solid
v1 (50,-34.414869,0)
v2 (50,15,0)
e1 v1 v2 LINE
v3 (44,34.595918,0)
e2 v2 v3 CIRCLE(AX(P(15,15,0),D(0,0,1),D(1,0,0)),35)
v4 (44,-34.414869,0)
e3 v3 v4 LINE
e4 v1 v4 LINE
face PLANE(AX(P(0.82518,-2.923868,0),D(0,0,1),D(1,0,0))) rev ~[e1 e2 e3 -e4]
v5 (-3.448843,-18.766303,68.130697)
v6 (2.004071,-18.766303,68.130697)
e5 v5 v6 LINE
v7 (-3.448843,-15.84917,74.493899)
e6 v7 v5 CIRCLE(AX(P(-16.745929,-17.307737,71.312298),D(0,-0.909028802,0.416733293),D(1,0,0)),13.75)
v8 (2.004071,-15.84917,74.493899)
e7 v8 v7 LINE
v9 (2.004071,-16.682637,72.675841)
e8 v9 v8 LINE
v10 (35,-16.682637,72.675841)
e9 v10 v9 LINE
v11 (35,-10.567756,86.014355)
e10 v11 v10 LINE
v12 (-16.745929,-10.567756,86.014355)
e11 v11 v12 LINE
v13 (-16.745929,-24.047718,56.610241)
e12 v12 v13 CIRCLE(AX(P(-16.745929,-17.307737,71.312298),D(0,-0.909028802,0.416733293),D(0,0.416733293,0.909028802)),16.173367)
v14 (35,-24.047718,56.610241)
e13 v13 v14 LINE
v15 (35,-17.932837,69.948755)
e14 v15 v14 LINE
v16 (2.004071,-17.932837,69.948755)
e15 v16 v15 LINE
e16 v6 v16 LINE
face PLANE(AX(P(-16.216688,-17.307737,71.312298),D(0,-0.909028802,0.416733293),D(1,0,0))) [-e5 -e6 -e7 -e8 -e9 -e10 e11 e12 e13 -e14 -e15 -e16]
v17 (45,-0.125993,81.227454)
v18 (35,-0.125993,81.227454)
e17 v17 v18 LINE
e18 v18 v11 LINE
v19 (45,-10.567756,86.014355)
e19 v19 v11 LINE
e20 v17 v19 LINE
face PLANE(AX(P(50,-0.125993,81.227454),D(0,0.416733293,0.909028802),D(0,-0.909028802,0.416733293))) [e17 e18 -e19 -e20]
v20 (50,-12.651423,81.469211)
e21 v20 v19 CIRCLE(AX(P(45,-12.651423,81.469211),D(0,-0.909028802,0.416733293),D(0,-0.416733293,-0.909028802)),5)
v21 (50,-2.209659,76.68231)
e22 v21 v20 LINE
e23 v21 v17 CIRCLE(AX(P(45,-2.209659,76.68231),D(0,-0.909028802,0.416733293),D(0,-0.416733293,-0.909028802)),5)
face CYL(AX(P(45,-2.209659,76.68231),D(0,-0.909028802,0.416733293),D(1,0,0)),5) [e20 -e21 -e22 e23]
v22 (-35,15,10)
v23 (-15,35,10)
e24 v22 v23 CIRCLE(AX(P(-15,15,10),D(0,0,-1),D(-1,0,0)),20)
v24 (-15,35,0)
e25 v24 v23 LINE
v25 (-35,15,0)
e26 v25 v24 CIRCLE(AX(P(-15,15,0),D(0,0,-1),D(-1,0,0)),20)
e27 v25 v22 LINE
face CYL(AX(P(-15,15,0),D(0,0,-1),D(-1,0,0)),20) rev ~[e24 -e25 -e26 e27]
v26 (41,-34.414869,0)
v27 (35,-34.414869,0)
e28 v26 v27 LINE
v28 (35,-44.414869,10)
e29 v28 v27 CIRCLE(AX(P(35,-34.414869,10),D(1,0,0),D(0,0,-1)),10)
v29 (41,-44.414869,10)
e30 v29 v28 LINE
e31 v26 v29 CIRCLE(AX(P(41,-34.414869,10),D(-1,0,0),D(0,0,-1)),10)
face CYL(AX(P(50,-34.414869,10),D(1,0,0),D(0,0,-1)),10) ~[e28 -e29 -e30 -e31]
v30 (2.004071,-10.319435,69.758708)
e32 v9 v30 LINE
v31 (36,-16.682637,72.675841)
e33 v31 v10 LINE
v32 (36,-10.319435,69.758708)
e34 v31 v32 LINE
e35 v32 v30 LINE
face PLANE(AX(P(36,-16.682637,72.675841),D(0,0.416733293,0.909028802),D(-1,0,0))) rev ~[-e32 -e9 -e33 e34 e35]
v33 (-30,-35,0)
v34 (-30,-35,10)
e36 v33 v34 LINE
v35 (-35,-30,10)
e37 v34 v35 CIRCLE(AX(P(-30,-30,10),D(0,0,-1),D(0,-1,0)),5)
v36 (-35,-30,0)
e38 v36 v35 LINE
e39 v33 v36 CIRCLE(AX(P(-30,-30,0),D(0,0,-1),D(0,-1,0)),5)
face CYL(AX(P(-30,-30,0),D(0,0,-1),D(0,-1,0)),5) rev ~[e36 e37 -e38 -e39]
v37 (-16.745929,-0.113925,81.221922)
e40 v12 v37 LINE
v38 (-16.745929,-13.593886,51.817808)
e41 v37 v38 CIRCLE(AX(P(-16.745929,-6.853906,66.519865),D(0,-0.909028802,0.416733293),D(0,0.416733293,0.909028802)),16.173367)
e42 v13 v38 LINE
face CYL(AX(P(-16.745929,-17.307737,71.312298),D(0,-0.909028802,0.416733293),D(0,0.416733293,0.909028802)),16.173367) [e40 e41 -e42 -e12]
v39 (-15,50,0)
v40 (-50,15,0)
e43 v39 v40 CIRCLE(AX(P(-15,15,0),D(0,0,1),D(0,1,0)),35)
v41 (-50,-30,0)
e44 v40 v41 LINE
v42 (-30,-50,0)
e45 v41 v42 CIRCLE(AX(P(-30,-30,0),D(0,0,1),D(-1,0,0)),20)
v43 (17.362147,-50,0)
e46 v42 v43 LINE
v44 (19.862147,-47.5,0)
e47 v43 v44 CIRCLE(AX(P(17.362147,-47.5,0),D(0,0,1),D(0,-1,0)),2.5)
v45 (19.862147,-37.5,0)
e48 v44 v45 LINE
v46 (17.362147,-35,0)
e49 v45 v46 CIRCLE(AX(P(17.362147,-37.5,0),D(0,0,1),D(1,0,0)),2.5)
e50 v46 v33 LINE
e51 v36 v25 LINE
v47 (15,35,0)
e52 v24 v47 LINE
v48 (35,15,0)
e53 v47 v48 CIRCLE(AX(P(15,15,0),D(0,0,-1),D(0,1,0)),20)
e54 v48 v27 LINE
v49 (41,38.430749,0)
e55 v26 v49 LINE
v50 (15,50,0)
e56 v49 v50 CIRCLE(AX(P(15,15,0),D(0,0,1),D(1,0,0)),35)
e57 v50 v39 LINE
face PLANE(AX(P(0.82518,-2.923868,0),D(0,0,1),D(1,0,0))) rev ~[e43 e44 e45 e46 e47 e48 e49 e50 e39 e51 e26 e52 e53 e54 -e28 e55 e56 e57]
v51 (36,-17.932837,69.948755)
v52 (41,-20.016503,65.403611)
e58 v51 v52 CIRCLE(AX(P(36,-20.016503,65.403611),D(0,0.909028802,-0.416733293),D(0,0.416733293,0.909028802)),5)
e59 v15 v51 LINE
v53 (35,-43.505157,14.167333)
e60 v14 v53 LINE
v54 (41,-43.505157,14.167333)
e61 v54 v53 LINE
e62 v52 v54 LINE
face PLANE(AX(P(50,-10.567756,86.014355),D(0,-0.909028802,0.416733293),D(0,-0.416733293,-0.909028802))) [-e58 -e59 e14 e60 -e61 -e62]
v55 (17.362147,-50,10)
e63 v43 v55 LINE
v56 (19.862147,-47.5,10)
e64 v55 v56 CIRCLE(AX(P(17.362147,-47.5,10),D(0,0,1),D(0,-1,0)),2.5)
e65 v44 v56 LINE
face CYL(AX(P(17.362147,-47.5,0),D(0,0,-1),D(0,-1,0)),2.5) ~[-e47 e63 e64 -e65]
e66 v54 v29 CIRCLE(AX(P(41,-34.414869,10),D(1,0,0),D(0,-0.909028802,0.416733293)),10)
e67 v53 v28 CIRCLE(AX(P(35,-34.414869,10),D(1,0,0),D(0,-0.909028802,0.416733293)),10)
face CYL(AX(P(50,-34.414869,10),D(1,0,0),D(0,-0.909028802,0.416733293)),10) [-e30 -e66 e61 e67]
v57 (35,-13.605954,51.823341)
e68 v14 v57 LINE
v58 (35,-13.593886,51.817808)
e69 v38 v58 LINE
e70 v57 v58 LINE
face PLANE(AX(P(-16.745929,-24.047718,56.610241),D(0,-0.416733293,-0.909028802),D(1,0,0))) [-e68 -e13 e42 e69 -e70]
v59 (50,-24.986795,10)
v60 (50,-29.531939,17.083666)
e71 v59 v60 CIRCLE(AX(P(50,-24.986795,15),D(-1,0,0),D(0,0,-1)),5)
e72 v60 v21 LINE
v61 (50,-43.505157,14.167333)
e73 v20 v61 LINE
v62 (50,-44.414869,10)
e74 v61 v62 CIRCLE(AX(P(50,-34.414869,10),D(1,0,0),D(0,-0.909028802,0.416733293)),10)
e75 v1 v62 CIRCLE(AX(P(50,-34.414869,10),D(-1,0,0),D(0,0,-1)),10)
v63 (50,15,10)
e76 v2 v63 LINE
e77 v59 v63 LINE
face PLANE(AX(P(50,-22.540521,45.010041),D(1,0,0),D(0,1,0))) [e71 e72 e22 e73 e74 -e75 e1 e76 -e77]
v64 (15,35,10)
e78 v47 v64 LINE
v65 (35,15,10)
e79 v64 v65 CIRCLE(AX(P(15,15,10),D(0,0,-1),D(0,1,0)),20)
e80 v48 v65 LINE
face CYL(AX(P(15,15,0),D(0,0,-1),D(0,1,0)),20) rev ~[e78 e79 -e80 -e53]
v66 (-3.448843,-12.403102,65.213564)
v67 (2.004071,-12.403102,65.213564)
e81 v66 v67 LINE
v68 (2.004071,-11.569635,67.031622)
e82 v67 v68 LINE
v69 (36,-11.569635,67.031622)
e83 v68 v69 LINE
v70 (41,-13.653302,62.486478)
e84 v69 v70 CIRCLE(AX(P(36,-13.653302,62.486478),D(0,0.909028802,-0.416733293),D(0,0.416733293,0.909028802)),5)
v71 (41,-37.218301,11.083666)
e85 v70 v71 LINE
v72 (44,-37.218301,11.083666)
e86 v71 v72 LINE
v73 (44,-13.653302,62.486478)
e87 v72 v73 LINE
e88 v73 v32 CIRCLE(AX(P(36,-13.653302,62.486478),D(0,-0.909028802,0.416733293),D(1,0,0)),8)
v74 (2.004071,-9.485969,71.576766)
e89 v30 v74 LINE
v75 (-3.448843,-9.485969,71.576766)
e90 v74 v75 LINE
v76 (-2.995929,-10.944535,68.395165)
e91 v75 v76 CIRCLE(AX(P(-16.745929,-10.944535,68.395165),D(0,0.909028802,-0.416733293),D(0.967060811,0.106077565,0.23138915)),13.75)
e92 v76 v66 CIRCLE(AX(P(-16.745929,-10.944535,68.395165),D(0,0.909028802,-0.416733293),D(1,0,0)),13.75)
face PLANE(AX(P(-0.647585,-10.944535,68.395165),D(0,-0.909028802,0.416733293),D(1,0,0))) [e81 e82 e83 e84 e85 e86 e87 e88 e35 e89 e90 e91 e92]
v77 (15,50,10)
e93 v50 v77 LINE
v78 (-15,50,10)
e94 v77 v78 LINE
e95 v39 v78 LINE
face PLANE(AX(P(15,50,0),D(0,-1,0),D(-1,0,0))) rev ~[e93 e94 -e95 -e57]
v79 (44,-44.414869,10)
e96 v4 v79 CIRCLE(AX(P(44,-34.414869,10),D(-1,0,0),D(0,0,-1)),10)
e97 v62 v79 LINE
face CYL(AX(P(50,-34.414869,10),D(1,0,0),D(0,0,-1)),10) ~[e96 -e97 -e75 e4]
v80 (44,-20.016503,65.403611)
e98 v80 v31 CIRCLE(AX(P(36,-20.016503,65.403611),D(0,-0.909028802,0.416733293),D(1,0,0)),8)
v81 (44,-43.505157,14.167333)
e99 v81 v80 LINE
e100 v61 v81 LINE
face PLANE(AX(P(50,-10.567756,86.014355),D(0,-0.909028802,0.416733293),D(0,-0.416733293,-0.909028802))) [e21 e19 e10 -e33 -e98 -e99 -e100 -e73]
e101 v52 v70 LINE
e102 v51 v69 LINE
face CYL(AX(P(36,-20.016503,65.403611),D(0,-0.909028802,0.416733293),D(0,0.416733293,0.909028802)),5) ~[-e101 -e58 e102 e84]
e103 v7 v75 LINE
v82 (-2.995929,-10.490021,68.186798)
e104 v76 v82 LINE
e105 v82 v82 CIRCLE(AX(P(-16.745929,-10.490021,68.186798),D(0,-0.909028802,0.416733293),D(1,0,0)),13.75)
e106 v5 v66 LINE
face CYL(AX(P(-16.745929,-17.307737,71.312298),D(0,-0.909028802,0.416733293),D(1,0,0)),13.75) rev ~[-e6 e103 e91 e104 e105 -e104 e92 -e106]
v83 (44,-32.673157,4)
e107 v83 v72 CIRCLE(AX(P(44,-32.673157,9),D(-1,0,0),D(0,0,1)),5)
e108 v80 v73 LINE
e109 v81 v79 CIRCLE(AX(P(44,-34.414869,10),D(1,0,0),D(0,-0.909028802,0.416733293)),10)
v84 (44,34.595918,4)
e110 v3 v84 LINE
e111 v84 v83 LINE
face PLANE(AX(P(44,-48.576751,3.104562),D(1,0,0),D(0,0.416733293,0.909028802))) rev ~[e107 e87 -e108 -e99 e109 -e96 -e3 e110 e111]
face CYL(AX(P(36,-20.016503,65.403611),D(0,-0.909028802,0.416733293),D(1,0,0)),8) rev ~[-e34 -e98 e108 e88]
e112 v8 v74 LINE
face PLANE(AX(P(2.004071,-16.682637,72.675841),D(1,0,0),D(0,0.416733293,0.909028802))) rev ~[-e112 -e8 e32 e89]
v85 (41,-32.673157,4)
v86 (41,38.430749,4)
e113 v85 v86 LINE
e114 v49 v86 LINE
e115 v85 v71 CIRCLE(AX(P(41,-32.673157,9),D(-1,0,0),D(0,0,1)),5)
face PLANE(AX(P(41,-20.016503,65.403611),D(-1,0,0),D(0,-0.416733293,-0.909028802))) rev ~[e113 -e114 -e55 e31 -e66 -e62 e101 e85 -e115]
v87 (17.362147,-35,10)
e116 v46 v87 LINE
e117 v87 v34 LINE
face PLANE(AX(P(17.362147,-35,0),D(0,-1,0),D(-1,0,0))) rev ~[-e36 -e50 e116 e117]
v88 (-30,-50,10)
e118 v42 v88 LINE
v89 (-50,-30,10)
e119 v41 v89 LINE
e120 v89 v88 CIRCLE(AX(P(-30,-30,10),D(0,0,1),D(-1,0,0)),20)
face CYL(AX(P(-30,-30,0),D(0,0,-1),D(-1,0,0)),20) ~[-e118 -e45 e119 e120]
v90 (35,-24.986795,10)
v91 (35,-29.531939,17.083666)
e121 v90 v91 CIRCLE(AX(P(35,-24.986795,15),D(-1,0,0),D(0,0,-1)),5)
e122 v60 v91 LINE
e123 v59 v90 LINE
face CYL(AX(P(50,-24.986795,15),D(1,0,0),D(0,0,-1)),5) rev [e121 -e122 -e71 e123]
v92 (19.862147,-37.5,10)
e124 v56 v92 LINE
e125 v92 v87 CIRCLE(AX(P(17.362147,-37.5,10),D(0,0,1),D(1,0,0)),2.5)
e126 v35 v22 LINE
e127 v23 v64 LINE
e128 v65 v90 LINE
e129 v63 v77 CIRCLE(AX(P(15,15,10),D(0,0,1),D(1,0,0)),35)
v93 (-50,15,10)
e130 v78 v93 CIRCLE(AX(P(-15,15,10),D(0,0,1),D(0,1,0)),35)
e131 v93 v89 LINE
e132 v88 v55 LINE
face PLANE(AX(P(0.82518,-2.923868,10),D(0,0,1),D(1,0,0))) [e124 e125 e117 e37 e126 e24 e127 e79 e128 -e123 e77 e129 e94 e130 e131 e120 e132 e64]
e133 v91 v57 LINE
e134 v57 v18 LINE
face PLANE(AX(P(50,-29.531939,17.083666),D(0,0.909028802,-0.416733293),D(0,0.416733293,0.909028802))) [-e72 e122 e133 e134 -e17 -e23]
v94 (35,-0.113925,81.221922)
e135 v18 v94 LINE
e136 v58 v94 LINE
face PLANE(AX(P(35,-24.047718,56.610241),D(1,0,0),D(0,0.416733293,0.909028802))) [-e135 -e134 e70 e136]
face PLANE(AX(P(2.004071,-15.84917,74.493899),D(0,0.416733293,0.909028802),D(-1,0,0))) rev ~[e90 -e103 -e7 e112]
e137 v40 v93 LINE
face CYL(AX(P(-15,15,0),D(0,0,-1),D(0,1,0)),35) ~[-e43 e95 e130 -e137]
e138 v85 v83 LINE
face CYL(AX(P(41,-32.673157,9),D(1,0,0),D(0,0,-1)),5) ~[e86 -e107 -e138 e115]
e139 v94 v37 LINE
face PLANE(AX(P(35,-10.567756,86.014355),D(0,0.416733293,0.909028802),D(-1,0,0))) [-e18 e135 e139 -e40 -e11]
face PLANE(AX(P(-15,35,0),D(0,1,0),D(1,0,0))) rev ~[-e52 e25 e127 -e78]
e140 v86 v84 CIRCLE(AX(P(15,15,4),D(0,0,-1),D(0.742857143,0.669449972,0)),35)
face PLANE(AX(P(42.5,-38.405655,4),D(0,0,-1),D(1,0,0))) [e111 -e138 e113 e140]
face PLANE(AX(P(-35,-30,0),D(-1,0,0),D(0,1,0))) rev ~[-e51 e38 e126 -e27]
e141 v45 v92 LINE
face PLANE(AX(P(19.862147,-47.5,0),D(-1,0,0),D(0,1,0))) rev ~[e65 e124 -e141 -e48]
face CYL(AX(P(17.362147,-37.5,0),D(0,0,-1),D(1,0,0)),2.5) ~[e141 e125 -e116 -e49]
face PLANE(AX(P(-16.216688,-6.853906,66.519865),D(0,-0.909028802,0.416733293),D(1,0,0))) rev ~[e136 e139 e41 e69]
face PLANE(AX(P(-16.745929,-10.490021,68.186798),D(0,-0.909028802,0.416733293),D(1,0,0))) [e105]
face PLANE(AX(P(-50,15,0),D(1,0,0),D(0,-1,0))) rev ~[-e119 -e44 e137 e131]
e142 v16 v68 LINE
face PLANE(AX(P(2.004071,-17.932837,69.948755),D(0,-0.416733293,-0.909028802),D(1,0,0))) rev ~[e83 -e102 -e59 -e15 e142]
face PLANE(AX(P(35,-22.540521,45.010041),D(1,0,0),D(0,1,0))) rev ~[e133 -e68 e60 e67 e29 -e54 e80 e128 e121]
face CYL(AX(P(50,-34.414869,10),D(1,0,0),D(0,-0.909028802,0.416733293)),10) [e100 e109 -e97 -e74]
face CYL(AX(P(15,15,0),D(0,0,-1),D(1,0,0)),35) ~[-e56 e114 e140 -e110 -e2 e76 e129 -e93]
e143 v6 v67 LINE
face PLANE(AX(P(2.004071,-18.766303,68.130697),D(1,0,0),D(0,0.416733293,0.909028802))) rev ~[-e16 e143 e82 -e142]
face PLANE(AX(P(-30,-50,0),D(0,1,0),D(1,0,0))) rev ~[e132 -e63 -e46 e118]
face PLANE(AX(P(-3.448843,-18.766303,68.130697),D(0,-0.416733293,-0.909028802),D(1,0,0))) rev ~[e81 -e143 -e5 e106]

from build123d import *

# Parameters (mm, degrees)
F1_DEPTH  = 10
F3_DEPTH  = 25.0000003725
F4_DEPTH  = 15
F5_R      = 13.75
F6_DEPTH  = 11.5
F7_DEPTH  = 7.5
F8_W      = 3
F8_H      = 12.169879545
F9_DEPTH  = 7
F10_W     = 3
F10_H     = 7.9815720619
F11_DEPTH = 4
F12_R     = 5
F13_R     = 5


# Not quite as in the source:
# - a feature names something its author has since deleted; it is built from what else it names


with BuildPart() as f1:
    # F0 (on Top) → F1 (new body)
    with BuildSketch(Plane.XY):
        with BuildLine():
            ThreePointArc((50, 15), (39.7487373415, 39.7487373415), (15, 50))
            Line((15, 50), (-15, 50))
            ThreePointArc((-15, 50), (-39.7487373415, 39.7487373415), (-50, 15))
            Line((-50, 15), (-50, -30))
            ThreePointArc((-50, -30), (-44.1421356237, -44.1421356237), (-30, -50))
            Line((-30, -50), (17.3621465266, -50))
            ThreePointArc((17.3621465266, -50), (19.1299134795, -49.267766953), (19.8621465266, -47.5))
            Line((19.8621465266, -47.5), (19.8621465266, -37.5))
            ThreePointArc((19.8621465266, -37.5), (19.1299134795, -35.732233047), (17.3621465266, -35))
            Line((17.3621465266, -35), (-30, -35))
            ThreePointArc((-30, -35), (-33.5355339059, -33.5355339059), (-35, -30))
            Line((-35, -30), (-35, 15))
            ThreePointArc((-35, 15), (-29.1421356237, 29.1421356237), (-15, 35))
            Line((-15, 35), (15, 35))
            ThreePointArc((15, 35), (29.1421356237, 29.1421356237), (35, 15))
            Line((35, 15), (35, -35))
            Line((35, -35), (35, -50))
            Line((35, -50), (50, -50))
            Line((50, -50), (50, 15))
        make_face()
    extrude(amount=F1_DEPTH)

    # F2 (on face) → F3 (cut)
    with BuildSketch(Plane.YZ.offset(50)):
        with BuildLine():
            ThreePointArc((-34.4148690401, 0), (-41.4859368519, 2.9289321881), (-44.4148690401, 10))
            Line((-44.4148690401, 10), (-50, 10))
            Line((-50, 10), (-50, 0))
            Line((-50, 0), (-34.4148690401, 0))
        make_face()
    extrude(amount=-F3_DEPTH, mode=Mode.SUBTRACT)

    # F2 (on face) → F4 (join)
    with BuildSketch(Plane.YZ.offset(50)):
        with BuildLine():
            Line((-10.5677563486, 86.0143546169), (-43.5051570601, 14.1673329256))
            ThreePointArc((-43.5051570601, 14.1673329256), (-44.1847943264, 12.1327353094), (-44.4148690401, 10))
            Line((-44.4148690401, 10), (-24.9867949218, 10))
            ThreePointArc((-24.9867949218, 10), (-29.1950209325, 12.299845589), (-29.5319389318, 17.0836664628))
            Line((-29.5319389318, 17.0836664628), (-0.1259929755, 81.2274541128))
            Line((-0.1259929755, 81.2274541128), (-10.5677563486, 86.0143546169))
        make_face()
    extrude(amount=-F4_DEPTH)

    # F5 (on face) → F6 (join)
    with BuildSketch(Plane(origin=(0, -41.3166681437, 18.9411282845), x_dir=(1, 0, 0), z_dir=(0, -0.909028802, 0.4167332926))):
        with BuildLine():
            ThreePointArc((-0.5725613731, 57.6122225326), (-5.3096309812, 69.0485202264), (-16.7459286749, 73.7855898345))
            ThreePointArc((-16.7459286749, 73.7855898345), (-32.9192959768, 57.6122225326), (-16.7459286749, 41.4388552308))
            ThreePointArc((-16.7459286749, 41.4388552308), (-5.3096309812, 46.1759248389), (-0.5725613731, 57.6122225326))
        make_face()
        with Locations((-16.7459286749, 57.6122225326)):
            Circle(F5_R, mode=Mode.SUBTRACT)
        with Locations((-16.7459286749, 57.6122225326)):
            Circle(F5_R)
        with BuildLine():
            Line((35, 41.4388552308), (35, 73.7855898345))
            Line((35, 73.7855898345), (-16.7459286749, 73.7855898345))
            ThreePointArc((-16.7459286749, 73.7855898345), (-5.3096309812, 69.0485202264), (-0.5725613731, 57.6122225326))
            ThreePointArc((-0.5725613731, 57.6122225326), (-5.3096309812, 46.1759248389), (-16.7459286749, 41.4388552308))
            Line((-16.7459286749, 41.4388552308), (35, 41.4388552308))
        make_face()
    extrude(amount=-F6_DEPTH)

    # F5 (on face) → F7 (cut)
    with BuildSketch(Plane(origin=(0, -41.3166681437, 18.9411282845), x_dir=(1, 0, 0), z_dir=(0, -0.909028802, 0.4167332926))):
        with Locations((-16.7459286749, 57.6122225326)):
            Circle(F5_R)
    extrude(amount=-F7_DEPTH, mode=Mode.SUBTRACT)

    # F8 (on face) → F9 (cut)
    with BuildSketch(Plane(origin=(0, -41.3166681437, 18.9411282845), x_dir=(1, 0, 0), z_dir=(0, -0.909028802, 0.4167332926))):
        with BuildLine():
            Line((2.0040713251, 56.1122225326), (2.0040713251, 59.1122225326))
            Line((2.0040713251, 59.1122225326), (2.0040713251, 61.1122225326))
            Line((2.0040713251, 61.1122225326), (-3.448842528, 61.1122225326))
            ThreePointArc((-3.448842528, 61.1122225326), (-3.109627224, 59.376813913), (-2.9959286749, 57.6122225326))
            ThreePointArc((-2.9959286749, 57.6122225326), (-3.109627224, 55.8476311523), (-3.448842528, 54.1122225326))
            Line((-3.448842528, 54.1122225326), (2.0040713251, 54.1122225326))
            Line((2.0040713251, 54.1122225326), (2.0040713251, 56.1122225326))
        make_face()
        with BuildLine():
            Line((36, 59.1122225326), (2.0040713251, 59.1122225326))
            Line((2.0040713251, 59.1122225326), (2.0040713251, 56.1122225326))
            Line((2.0040713251, 56.1122225326), (36, 56.1122225326))
            ThreePointArc((36, 56.1122225326), (39.5355339059, 54.6477564386), (41, 51.1122225326))
            Line((41, 51.1122225326), (41, -5.251533668))
            Line((41, -5.251533668), (44, -5.251533668))
            Line((44, -5.251533668), (44, 51.1122225326))
            ThreePointArc((44, 51.1122225326), (41.6568542495, 56.7690767821), (36, 59.1122225326))
        make_face()
        with Locations((42.5, -11.3364734405)):
            Rectangle(F8_W, F8_H)
    extrude(amount=-F9_DEPTH, mode=Mode.SUBTRACT)

    # F10 (on face) → F11 (cut)
    with BuildSketch(Plane(origin=(0, 0, 0), x_dir=(1, 0, 0), z_dir=(0, 0, -1))):
        with Locations((42.5, 38.4056550711)):
            Rectangle(F10_W, F10_H)
        with BuildLine():
            Line((44, 34.4148690401), (41, 34.4148690401))
            Line((41, 34.4148690401), (41, -38.4307490277))
            ThreePointArc((41, -38.4307490277), (42.5667640895, -36.5655632349), (44, -34.5959179423))
            Line((44, -34.5959179423), (44, 34.4148690401))
        make_face()
    extrude(amount=-F11_DEPTH, mode=Mode.SUBTRACT)

    # F12
    f12_edges = [f1.edges().sort_by_distance(p)[0] for p in [
        (42.5, -40.465722, 4),
    ]]
    fillet(f12_edges, radius=F12_R)

    # F13
    f13_edges = [f1.edges().sort_by_distance(p)[0] for p in [
        (50, -5.346875, 83.620904),
    ]]
    fillet(f13_edges, radius=F13_R)


solid = f1.part
